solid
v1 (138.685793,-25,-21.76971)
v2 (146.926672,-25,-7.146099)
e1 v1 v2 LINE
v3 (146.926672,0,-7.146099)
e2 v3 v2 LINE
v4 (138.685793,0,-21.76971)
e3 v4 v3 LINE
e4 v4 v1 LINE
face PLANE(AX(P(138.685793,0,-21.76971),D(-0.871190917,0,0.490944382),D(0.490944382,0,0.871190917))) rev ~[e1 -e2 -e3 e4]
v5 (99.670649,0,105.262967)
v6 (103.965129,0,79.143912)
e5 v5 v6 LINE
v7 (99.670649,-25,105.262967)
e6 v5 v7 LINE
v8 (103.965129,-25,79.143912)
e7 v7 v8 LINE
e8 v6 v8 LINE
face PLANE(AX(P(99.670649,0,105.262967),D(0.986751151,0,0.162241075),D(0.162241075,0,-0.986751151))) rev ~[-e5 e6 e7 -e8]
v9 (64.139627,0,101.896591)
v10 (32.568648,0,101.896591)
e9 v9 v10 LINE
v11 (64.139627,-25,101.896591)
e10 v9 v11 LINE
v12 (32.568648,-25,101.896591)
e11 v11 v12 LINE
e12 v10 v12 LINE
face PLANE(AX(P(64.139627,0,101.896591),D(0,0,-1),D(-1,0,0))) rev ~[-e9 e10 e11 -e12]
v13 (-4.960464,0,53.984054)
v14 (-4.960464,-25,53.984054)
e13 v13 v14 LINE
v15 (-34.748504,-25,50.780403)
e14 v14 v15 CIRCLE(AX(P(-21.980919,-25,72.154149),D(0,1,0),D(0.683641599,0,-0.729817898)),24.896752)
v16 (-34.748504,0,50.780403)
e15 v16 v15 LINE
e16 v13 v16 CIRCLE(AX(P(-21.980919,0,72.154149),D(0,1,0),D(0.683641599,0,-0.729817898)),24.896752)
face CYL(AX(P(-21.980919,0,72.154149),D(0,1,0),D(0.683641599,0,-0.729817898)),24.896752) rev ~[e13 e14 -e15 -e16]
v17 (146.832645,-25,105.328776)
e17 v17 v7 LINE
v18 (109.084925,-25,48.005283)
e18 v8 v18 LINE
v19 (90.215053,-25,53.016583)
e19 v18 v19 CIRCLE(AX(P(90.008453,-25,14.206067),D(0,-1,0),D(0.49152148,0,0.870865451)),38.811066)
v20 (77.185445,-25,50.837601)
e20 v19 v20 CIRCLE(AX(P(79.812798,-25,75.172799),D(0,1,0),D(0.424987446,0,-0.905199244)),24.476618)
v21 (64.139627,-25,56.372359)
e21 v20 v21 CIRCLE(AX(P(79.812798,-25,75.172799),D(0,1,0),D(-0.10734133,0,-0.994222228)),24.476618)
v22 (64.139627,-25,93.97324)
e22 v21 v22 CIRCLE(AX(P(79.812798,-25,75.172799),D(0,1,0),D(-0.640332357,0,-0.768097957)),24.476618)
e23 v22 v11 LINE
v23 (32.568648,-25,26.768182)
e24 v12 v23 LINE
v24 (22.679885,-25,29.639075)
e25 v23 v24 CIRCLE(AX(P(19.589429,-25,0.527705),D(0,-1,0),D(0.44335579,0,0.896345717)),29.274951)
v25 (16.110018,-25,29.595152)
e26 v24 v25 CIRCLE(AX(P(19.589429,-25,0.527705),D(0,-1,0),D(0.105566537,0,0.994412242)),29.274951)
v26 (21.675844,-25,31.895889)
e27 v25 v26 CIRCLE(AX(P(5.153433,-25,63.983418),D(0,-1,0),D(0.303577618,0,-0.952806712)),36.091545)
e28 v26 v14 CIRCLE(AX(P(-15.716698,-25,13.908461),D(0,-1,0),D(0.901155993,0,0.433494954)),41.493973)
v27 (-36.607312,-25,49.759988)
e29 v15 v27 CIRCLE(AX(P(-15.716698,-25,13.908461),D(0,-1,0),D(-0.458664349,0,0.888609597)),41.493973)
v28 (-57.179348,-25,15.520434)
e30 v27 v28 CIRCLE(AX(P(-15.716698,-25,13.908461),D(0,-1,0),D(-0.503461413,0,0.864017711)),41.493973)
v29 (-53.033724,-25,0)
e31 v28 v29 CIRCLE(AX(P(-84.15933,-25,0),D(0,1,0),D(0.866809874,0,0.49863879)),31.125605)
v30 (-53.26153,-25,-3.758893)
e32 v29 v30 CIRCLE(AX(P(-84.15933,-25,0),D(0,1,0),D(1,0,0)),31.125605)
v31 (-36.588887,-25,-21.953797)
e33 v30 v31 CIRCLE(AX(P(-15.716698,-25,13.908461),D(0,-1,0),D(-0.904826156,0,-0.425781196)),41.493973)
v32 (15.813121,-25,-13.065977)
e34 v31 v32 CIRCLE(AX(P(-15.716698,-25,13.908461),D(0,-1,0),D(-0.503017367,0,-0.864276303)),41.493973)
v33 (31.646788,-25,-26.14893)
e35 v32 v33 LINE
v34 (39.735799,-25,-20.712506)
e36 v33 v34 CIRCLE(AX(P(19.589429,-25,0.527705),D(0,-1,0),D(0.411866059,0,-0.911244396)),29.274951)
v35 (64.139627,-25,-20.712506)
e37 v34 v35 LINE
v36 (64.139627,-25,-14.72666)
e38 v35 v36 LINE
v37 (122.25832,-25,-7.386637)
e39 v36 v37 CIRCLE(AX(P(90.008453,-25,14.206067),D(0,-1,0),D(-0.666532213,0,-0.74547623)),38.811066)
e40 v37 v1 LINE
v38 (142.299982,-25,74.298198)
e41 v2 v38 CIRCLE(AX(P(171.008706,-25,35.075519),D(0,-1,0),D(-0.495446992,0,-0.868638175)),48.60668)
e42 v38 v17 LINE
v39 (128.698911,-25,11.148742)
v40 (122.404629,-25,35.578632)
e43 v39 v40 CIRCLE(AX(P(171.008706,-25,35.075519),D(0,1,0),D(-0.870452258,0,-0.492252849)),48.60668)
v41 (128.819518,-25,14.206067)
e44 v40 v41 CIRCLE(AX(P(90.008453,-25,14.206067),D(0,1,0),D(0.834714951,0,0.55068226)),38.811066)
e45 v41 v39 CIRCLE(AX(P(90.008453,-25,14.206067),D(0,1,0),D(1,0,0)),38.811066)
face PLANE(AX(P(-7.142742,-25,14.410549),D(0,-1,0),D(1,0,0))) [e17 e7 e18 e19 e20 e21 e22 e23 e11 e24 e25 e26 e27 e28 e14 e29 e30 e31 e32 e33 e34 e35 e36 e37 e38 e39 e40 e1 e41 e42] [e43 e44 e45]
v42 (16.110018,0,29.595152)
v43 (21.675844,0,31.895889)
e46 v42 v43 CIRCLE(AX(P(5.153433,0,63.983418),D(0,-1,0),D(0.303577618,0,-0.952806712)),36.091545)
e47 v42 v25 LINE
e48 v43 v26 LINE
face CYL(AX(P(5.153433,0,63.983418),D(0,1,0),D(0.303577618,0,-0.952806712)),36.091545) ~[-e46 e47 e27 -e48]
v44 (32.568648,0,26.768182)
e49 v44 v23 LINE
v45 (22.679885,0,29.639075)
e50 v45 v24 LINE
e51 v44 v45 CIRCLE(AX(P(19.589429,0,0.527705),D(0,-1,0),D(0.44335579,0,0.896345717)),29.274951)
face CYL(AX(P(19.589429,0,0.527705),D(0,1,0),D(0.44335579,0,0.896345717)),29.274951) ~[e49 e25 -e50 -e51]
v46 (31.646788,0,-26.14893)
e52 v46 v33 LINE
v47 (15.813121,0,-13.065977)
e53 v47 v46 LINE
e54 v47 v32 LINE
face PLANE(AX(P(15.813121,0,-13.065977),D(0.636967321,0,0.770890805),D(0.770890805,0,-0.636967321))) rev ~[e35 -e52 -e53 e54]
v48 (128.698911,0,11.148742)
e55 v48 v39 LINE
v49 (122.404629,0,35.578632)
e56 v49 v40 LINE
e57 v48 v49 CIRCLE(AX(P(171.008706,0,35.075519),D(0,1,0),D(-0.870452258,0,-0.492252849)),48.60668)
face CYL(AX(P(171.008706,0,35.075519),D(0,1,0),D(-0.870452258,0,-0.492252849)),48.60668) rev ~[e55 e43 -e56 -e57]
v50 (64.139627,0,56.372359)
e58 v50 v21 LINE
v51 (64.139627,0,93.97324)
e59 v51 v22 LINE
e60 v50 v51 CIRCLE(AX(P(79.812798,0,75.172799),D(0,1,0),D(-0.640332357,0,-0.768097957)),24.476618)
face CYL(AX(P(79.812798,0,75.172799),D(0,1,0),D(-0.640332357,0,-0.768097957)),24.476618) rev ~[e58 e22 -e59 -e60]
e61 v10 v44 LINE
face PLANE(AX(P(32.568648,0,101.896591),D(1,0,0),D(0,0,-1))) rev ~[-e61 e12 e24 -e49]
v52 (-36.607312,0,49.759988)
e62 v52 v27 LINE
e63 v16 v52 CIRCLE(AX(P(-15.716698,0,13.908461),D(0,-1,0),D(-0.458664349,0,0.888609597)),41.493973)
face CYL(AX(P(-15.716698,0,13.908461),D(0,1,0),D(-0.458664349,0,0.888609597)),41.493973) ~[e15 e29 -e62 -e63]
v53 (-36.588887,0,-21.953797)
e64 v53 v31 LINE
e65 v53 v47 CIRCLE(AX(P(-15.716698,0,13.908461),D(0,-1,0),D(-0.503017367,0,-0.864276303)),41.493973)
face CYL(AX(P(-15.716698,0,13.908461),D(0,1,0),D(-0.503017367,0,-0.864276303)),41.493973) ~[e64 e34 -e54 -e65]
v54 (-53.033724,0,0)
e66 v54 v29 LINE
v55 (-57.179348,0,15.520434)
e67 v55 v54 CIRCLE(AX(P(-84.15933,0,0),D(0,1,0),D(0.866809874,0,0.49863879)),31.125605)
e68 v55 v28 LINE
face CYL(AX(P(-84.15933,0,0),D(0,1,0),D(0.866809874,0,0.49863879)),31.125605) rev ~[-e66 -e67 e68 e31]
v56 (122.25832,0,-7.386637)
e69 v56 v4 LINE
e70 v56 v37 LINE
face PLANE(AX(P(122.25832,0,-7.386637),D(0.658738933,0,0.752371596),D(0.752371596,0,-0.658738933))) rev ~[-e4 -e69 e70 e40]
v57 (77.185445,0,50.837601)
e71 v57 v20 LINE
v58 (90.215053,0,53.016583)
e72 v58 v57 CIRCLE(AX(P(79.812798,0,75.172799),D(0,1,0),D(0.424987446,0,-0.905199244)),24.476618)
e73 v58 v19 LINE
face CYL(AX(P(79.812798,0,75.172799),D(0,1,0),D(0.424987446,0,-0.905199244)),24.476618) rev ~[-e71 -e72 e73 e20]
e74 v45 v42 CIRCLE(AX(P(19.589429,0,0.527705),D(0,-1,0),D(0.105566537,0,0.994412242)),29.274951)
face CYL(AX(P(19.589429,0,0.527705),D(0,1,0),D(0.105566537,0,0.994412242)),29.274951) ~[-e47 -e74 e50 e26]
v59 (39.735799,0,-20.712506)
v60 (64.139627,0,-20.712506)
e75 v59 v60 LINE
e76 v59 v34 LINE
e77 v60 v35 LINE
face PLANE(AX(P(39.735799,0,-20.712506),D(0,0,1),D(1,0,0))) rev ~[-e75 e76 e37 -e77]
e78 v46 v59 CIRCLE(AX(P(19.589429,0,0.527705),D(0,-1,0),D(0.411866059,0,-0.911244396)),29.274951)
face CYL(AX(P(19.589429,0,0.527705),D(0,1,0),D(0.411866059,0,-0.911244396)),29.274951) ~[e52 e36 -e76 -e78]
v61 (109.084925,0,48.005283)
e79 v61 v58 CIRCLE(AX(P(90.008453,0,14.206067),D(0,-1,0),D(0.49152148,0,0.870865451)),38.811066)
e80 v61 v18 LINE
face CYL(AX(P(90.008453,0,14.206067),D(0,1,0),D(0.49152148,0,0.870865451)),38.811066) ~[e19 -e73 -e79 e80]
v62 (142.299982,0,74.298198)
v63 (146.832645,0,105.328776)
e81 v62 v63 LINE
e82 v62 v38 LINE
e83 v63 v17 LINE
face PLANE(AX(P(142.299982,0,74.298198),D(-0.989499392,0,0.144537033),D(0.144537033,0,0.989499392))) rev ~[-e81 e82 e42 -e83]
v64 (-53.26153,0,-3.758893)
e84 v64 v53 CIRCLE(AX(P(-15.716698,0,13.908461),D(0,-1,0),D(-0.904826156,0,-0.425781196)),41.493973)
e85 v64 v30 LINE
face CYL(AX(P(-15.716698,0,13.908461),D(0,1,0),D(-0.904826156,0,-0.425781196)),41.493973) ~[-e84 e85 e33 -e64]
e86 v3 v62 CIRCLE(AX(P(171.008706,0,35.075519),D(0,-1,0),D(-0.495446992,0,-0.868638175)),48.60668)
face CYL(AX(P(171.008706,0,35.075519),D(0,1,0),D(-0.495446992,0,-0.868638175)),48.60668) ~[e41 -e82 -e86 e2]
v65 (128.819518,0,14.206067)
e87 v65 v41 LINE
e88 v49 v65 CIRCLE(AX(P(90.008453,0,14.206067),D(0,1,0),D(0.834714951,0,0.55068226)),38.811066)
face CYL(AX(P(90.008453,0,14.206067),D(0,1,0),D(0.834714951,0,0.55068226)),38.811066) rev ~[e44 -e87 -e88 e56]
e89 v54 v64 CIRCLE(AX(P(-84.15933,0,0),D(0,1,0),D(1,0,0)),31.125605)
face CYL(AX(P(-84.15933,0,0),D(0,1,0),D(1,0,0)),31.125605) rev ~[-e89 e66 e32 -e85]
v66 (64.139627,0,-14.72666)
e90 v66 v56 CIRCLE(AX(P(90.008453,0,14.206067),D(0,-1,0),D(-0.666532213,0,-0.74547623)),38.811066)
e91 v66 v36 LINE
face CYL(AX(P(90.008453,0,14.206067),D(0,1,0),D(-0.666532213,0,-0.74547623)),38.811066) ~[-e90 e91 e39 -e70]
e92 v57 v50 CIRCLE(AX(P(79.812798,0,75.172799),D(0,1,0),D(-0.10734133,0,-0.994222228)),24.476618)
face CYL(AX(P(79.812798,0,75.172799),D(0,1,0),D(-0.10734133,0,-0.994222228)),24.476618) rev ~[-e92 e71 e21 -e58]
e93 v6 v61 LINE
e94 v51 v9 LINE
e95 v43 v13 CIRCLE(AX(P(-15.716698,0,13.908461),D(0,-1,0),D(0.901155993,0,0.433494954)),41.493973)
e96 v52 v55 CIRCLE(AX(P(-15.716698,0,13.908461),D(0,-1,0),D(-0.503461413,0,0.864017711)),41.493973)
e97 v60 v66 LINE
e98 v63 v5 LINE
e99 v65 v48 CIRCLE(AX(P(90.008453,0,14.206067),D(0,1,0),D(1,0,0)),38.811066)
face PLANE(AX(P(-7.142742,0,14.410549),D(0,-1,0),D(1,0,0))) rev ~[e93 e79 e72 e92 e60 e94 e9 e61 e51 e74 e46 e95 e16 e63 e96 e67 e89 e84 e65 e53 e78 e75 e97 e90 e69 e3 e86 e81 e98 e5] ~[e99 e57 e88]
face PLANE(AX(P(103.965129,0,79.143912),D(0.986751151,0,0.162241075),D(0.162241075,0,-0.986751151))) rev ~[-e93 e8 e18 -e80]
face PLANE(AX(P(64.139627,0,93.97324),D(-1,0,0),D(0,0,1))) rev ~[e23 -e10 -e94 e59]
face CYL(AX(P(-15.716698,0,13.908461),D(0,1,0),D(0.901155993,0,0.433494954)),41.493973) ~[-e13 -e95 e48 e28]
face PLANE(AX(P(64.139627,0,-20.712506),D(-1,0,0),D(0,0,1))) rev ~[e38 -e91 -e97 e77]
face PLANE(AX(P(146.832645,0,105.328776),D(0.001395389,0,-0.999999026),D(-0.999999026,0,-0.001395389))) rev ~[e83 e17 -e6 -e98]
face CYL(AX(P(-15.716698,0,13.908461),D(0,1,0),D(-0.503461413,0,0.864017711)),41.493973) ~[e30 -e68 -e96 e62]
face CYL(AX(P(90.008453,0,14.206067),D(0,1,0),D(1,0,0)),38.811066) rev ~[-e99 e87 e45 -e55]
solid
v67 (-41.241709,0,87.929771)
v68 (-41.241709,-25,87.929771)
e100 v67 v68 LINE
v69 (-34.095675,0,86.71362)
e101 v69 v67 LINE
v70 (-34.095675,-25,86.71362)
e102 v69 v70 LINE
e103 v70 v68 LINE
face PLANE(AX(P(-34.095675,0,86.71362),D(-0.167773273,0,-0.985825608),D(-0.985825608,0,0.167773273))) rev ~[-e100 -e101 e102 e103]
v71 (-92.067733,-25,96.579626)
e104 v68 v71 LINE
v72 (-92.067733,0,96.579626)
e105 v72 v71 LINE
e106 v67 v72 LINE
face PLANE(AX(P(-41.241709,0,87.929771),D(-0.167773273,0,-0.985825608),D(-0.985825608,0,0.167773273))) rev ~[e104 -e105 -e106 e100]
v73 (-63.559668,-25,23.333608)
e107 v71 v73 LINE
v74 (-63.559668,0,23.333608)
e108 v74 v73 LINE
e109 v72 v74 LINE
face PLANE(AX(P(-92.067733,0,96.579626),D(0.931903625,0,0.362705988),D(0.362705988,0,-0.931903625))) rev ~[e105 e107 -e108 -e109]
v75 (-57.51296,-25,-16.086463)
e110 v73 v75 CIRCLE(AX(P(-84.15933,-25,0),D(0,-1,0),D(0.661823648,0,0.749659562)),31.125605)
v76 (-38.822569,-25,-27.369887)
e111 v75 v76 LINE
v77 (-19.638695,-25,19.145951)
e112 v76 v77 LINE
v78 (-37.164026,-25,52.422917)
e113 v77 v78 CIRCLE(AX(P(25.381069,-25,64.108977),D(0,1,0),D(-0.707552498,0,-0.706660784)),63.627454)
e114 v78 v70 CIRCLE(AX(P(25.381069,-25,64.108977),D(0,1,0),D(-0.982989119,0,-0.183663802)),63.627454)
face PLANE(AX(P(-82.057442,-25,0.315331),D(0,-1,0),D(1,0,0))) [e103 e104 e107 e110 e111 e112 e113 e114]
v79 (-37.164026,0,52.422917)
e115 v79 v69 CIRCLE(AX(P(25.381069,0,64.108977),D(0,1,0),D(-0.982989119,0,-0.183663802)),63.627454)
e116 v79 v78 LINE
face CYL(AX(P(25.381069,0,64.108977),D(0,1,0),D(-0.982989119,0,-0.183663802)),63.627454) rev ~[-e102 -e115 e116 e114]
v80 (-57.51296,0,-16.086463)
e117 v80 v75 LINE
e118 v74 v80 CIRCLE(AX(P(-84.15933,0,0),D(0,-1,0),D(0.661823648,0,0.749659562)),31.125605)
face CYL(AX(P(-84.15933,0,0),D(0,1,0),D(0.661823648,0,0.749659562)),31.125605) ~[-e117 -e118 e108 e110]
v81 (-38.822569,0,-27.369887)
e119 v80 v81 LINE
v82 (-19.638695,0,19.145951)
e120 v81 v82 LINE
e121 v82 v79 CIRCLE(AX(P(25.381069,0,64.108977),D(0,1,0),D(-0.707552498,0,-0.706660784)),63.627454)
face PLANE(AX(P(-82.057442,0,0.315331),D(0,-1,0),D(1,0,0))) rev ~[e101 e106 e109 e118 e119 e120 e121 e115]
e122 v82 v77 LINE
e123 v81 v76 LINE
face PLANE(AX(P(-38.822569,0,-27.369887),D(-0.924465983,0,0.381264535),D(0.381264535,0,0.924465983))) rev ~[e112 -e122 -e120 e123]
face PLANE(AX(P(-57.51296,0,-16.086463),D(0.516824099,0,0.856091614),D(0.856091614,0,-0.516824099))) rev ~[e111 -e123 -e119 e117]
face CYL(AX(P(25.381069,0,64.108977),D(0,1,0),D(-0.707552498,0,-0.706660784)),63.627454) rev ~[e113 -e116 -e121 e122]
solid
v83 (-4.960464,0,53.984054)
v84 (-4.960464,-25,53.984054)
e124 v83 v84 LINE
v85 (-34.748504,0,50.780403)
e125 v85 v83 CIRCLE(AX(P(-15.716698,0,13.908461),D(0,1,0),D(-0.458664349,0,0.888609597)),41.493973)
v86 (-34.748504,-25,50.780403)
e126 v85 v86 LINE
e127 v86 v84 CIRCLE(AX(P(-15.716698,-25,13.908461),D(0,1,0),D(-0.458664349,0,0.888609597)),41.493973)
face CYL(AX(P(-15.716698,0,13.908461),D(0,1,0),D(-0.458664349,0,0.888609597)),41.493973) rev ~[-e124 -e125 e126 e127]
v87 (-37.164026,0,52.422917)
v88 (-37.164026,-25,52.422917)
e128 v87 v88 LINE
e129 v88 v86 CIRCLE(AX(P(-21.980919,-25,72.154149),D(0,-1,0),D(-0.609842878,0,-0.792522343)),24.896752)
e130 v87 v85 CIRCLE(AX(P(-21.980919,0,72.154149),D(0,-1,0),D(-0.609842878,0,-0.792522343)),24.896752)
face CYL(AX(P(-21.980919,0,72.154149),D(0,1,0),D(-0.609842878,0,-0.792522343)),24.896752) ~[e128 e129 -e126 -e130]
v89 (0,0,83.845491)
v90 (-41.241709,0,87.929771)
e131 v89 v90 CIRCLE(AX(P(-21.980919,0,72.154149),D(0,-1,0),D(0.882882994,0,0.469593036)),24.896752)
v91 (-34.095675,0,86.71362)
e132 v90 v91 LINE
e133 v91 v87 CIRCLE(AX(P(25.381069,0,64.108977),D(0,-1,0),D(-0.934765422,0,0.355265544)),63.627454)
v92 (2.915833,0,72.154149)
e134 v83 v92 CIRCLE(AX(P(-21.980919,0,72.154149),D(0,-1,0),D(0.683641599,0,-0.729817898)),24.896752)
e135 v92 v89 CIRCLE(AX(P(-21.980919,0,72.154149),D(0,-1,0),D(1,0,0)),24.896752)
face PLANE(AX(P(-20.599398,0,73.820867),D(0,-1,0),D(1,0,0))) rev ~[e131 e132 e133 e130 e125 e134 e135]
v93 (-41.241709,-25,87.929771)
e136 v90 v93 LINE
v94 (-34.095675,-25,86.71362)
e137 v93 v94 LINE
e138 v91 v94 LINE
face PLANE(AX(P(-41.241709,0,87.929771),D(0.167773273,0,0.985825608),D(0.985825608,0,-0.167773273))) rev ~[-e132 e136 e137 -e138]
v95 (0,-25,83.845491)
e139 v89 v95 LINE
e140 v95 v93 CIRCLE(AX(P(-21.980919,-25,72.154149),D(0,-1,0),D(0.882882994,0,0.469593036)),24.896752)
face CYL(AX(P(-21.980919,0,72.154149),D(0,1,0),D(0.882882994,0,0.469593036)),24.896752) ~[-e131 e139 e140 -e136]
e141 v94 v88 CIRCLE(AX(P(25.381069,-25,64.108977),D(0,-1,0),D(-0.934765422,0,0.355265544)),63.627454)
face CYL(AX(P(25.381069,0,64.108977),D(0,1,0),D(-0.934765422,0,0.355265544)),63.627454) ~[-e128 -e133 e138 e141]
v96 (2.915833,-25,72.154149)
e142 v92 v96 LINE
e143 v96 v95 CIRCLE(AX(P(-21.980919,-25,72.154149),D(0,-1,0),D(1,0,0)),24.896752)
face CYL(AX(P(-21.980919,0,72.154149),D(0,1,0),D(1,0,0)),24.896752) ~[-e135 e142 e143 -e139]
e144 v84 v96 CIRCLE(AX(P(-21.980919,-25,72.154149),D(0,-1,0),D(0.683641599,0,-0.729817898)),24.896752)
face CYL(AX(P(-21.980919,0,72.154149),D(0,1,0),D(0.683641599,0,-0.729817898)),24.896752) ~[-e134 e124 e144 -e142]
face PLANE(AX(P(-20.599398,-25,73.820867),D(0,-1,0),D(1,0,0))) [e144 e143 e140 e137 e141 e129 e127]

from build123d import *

# Parameters (mm, degrees)
F3_DEPTH = 25


with BuildPart() as f3:
    # F0 (on Front) → F3 (new body)
    with BuildSketch(Plane.XZ):
        with BuildLine():
            ThreePointArc((-57.5129599565, -16.0864628453), (-54.1744360224, -8.3492191036), (-53.0337243425, 0))
            ThreePointArc((-53.0337243425, 0), (-55.7869818002, 12.7989524029), (-63.5596679574, 23.3336075535))
            ThreePointArc((-63.5596679574, 23.3336075535), (-114.9250954512, -4.7192103171), (-57.5129599565, -16.0864628453))
        make_face()
        with BuildLine():
            ThreePointArc((-63.5596679574, 23.3336075535), (-55.7869818002, 12.7989524029), (-53.0337243425, 0))
            ThreePointArc((-53.0337243425, 0), (-54.1744360224, -8.3492191036), (-57.5129599565, -16.0864628453))
            Line((-57.5129599565, -16.0864628453), (-38.822568953, -27.3698866367))
            Line((-38.822568953, -27.3698866367), (-19.6386948228, 19.145950675))
            ThreePointArc((-19.6386948228, 19.145950675), (-30.9162562326, 34.4599627539), (-37.1640258454, 52.4229171927))
            ThreePointArc((-37.1640258454, 52.4229171927), (-46.7150991932, 69.3136234913), (-41.2417085605, 87.9297712223))
            Line((-41.2417085605, 87.9297712223), (-92.067733407, 96.5796262026))
            Line((-92.067733407, 96.5796262026), (-63.5596679574, 23.3336075535))
        make_face()
        with BuildLine():
            Line((-34.0956747532, 86.7136195302), (-41.2417085605, 87.9297712223))
            ThreePointArc((-41.2417085605, 87.9297712223), (-46.7150991932, 69.3136234913), (-37.1640258454, 52.4229171927))
            ThreePointArc((-37.1640258454, 52.4229171927), (-37.9931792296, 69.7797403469), (-34.0956747532, 86.7136195302))
        make_face()
    extrude(amount=F3_DEPTH)


with BuildPart() as f3b:
    # F1 (on face) → F3, piece 2 (new body)
    with BuildSketch(Plane.XZ):
        with BuildLine():
            ThreePointArc((22.6798846139, 29.6390745967), (19.3937151758, 29.8020017295), (16.1100178957, 29.5951515436))
            ThreePointArc((16.1100178957, 29.5951515436), (18.9410054417, 30.6292208692), (21.67584417, 31.895888539))
            ThreePointArc((21.67584417, 31.895888539), (10.7700522114, 45.849059237), (-4.9604636005, 53.9840542009))
            ThreePointArc((-4.9604636005, 53.9840542009), (-19.3186695983, 47.400145928), (-34.7485039853, 50.7804030796))
            ThreePointArc((-34.7485039853, 50.7804030796), (-35.6844274432, 50.2820713922), (-36.6073121526, 49.7599880627))
            ThreePointArc((-36.6073121526, 49.7599880627), (-30.2695427886, 33.2631947723), (-19.6386948228, 19.145950675))
            Line((-19.6386948228, 19.145950675), (-36.5888869277, -21.9537965919))
            ThreePointArc((-36.5888869277, -21.9537965919), (-8.7780666366, -27.0012589518), (15.8131210591, -13.0659767785))
            ThreePointArc((15.8131210591, -13.0659767785), (23.2066061979, -0.4695140568), (25.7772746795, 13.9084607363))
            ThreePointArc((25.7772746795, 13.9084607363), (24.9955637813, 21.9247884124), (22.6798846139, 29.6390745967))
        make_face()
        with BuildLine():
            ThreePointArc((32.5686484575, 26.7681818786), (27.7514826988, 28.6418231537), (22.6798846139, 29.6390745967))
            ThreePointArc((22.6798846139, 29.6390745967), (24.9955637813, 21.9247884124), (25.7772746795, 13.9084607363))
            ThreePointArc((25.7772746795, 13.9084607363), (23.2066061979, -0.4695140568), (15.8131210591, -13.0659767785))
            Line((15.8131210591, -13.0659767785), (31.6467881203, -26.148930192))
            ThreePointArc((31.6467881203, -26.148930192), (35.919117176, -23.7697035307), (39.7357987823, -20.712506026))
            Line((39.7357987823, -20.712506026), (32.5686484575, -20.712506026))
            Line((32.5686484575, -20.712506026), (32.5686484575, 26.7681818786))
        make_face()
        with BuildLine():
            Line((32.5686484575, 87.4569258152), (32.5686484575, 40.5099101671))
            ThreePointArc((32.5686484575, 40.5099101671), (41.2449777291, 63.9834179912), (32.5686484575, 87.4569258152))
        make_face()
        with BuildLine():
            ThreePointArc((32.5686484575, 87.4569258152), (41.2449777291, 63.9834179912), (32.5686484575, 40.5099101671))
            Line((32.5686484575, 40.5099101671), (32.5686484575, 26.7681818786))
            ThreePointArc((32.5686484575, 26.7681818786), (48.5364514198, 4.8972215897), (39.7357987823, -20.712506026))
            Line((39.7357987823, -20.712506026), (64.1396269202, -20.712506026))
            Line((64.1396269202, -20.712506026), (64.1396269202, -14.7266603521))
            ThreePointArc((64.1396269202, -14.7266603521), (51.1973866521, 14.2060667276), (64.1396269202, 43.1387938073))
            Line((64.1396269202, 43.1387938073), (64.1396269202, 56.3723585854))
            ThreePointArc((64.1396269202, 56.3723585854), (55.3361792801, 75.172799182), (64.1396269202, 93.9732397787))
            Line((64.1396269202, 93.9732397787), (64.1396269202, 101.8965914845))
            Line((64.1396269202, 101.8965914845), (32.5686484575, 101.8965914845))
            Line((32.5686484575, 101.8965914845), (32.5686484575, 87.4569258152))
        make_face()
        with BuildLine():
            ThreePointArc((39.7357987823, -20.712506026), (48.5364514198, 4.8972215897), (32.5686484575, 26.7681818786))
            Line((32.5686484575, 26.7681818786), (32.5686484575, -20.712506026))
            Line((32.5686484575, -20.712506026), (39.7357987823, -20.712506026))
        make_face()
        with BuildLine():
            ThreePointArc((-19.6386948228, 19.145950675), (-30.2695427886, 33.2631947723), (-36.6073121526, 49.7599880627))
            ThreePointArc((-36.6073121526, 49.7599880627), (-51.2845084466, 35.2785480536), (-57.1793476261, 15.5204341043))
            ThreePointArc((-57.1793476261, 15.5204341043), (-54.0879846732, 8.0322796764), (-53.0337243425, 0))
            ThreePointArc((-53.0337243425, 0), (-53.0907279184, -1.8828946308), (-53.261529853, -3.7588925779))
            ThreePointArc((-53.261529853, -3.7588925779), (-46.3091923785, -14.1245387359), (-36.5888869277, -21.9537965919))
            Line((-36.5888869277, -21.9537965919), (-19.6386948228, 19.145950675))
        make_face()
        with BuildLine():
            ThreePointArc((64.1396269202, 43.1387938073), (51.1973866521, 14.2060667276), (64.1396269202, -14.7266603521))
            Line((64.1396269202, -14.7266603521), (64.1396269202, 43.1387938073))
        make_face()
        with BuildLine():
            Line((64.1396269202, 43.1387938073), (64.1396269202, -14.7266603521))
            ThreePointArc((64.1396269202, -14.7266603521), (94.8714157265, -24.299133232), (122.2583204617, -7.3866369852))
            ThreePointArc((122.2583204617, -7.3866369852), (126.6693657888, 1.4672962095), (128.6989113378, 11.1487423185))
            ThreePointArc((128.6989113378, 11.1487423185), (123.9392055501, 22.9482151463), (122.4046294826, 35.578632182))
            ThreePointArc((122.4046294826, 35.578632182), (116.4841739619, 42.5844918046), (109.084925085, 48.0052831383))
            ThreePointArc((109.084925085, 48.0052831383), (99.9702550376, 51.7168828456), (90.2150532091, 53.0165827137))
            ThreePointArc((90.2150532091, 53.0165827137), (83.8500329286, 51.0314326127), (77.1854449114, 50.8376010994))
            ThreePointArc((77.1854449114, 50.8376010994), (70.2832808433, 47.6308544859), (64.1396269202, 43.1387938073))
        make_face()
        with BuildLine():
            Line((64.1396269202, 56.3723585854), (64.1396269202, 43.1387938073))
            ThreePointArc((64.1396269202, 43.1387938073), (70.2832808433, 47.6308544859), (77.1854449114, 50.8376010994))
            ThreePointArc((77.1854449114, 50.8376010994), (70.2532121523, 52.6401745495), (64.1396269202, 56.3723585854))
        make_face()
        with BuildLine():
            ThreePointArc((128.6989113378, 11.1487423185), (126.6693657888, 1.4672962095), (122.2583204617, -7.3866369852))
            Line((122.2583204617, -7.3866369852), (138.6857926846, -21.7697098851))
            Line((138.6857926846, -21.7697098851), (146.9266724857, -7.1460989624))
            ThreePointArc((146.9266724857, -7.1460989624), (136.5755240921, 0.7685904427), (128.6989113378, 11.1487423185))
        make_face()
        with BuildLine():
            Line((99.6706486582, 105.2629665375), (103.96512909, 79.1439118403))
            Line((103.96512909, 79.1439118403), (109.084925085, 48.0052831383))
            ThreePointArc((109.084925085, 48.0052831383), (116.4841739619, 42.5844918046), (122.4046294826, 35.578632182))
            ThreePointArc((122.4046294826, 35.578632182), (127.775402975, 57.2901740208), (142.2999815172, 74.2981978653))
            Line((142.2999815172, 74.2981978653), (146.8326449394, 105.3287759423))
            Line((146.8326449394, 105.3287759423), (99.6706486582, 105.2629665375))
        make_face()
        with BuildLine():
            ThreePointArc((128.8195184172, 14.2060667276), (128.789354926, 12.6762155412), (128.6989113378, 11.1487423185))
            ThreePointArc((128.6989113378, 11.1487423185), (136.5755240921, 0.7685904427), (146.9266724857, -7.1460989624))
            ThreePointArc((146.9266724857, -7.1460989624), (195.4224488753, -6.9551665697), (219.6153865573, 35.0755192339))
            ThreePointArc((219.6153865573, 35.0755192339), (192.9993129943, 78.4232134504), (142.2999815172, 74.2981978653))
            ThreePointArc((142.2999815172, 74.2981978653), (127.775402975, 57.2901740208), (122.4046294826, 35.578632182))
            ThreePointArc((122.4046294826, 35.578632182), (127.1812180547, 25.3633217008), (128.8195184172, 14.2060667276))
        make_face()
    extrude(amount=F3_DEPTH)


with BuildPart() as f3c:
    # F1 (on face) → F3, piece 3 (new body)
    with BuildSketch(Plane.XZ):
        with BuildLine():
            ThreePointArc((-34.7485039853, 50.7804030796), (-20.1537146111, 55.1645227662), (-4.9604636005, 53.9840542009))
            ThreePointArc((-4.9604636005, 53.9840542009), (0.8620484172, 62.252275739), (2.9158330555, 72.1541494131))
            ThreePointArc((2.9158330555, 72.1541494131), (2.1758787307, 78.1788806293), (0, 83.8454907605))
            ThreePointArc((0, 83.8454907605), (-19.5273271661, 96.9297048561), (-41.2417085605, 87.9297712223))
            Line((-41.2417085605, 87.9297712223), (-34.0956747532, 86.7136195302))
            ThreePointArc((-34.0956747532, 86.7136195302), (-37.9931792296, 69.7797403469), (-37.1640258454, 52.4229171927))
            ThreePointArc((-37.1640258454, 52.4229171927), (-35.9803745824, 51.5662038637), (-34.7485039853, 50.7804030796))
        make_face()
    extrude(amount=F3_DEPTH)


solid = Compound([f3.part, f3b.part, f3c.part])
